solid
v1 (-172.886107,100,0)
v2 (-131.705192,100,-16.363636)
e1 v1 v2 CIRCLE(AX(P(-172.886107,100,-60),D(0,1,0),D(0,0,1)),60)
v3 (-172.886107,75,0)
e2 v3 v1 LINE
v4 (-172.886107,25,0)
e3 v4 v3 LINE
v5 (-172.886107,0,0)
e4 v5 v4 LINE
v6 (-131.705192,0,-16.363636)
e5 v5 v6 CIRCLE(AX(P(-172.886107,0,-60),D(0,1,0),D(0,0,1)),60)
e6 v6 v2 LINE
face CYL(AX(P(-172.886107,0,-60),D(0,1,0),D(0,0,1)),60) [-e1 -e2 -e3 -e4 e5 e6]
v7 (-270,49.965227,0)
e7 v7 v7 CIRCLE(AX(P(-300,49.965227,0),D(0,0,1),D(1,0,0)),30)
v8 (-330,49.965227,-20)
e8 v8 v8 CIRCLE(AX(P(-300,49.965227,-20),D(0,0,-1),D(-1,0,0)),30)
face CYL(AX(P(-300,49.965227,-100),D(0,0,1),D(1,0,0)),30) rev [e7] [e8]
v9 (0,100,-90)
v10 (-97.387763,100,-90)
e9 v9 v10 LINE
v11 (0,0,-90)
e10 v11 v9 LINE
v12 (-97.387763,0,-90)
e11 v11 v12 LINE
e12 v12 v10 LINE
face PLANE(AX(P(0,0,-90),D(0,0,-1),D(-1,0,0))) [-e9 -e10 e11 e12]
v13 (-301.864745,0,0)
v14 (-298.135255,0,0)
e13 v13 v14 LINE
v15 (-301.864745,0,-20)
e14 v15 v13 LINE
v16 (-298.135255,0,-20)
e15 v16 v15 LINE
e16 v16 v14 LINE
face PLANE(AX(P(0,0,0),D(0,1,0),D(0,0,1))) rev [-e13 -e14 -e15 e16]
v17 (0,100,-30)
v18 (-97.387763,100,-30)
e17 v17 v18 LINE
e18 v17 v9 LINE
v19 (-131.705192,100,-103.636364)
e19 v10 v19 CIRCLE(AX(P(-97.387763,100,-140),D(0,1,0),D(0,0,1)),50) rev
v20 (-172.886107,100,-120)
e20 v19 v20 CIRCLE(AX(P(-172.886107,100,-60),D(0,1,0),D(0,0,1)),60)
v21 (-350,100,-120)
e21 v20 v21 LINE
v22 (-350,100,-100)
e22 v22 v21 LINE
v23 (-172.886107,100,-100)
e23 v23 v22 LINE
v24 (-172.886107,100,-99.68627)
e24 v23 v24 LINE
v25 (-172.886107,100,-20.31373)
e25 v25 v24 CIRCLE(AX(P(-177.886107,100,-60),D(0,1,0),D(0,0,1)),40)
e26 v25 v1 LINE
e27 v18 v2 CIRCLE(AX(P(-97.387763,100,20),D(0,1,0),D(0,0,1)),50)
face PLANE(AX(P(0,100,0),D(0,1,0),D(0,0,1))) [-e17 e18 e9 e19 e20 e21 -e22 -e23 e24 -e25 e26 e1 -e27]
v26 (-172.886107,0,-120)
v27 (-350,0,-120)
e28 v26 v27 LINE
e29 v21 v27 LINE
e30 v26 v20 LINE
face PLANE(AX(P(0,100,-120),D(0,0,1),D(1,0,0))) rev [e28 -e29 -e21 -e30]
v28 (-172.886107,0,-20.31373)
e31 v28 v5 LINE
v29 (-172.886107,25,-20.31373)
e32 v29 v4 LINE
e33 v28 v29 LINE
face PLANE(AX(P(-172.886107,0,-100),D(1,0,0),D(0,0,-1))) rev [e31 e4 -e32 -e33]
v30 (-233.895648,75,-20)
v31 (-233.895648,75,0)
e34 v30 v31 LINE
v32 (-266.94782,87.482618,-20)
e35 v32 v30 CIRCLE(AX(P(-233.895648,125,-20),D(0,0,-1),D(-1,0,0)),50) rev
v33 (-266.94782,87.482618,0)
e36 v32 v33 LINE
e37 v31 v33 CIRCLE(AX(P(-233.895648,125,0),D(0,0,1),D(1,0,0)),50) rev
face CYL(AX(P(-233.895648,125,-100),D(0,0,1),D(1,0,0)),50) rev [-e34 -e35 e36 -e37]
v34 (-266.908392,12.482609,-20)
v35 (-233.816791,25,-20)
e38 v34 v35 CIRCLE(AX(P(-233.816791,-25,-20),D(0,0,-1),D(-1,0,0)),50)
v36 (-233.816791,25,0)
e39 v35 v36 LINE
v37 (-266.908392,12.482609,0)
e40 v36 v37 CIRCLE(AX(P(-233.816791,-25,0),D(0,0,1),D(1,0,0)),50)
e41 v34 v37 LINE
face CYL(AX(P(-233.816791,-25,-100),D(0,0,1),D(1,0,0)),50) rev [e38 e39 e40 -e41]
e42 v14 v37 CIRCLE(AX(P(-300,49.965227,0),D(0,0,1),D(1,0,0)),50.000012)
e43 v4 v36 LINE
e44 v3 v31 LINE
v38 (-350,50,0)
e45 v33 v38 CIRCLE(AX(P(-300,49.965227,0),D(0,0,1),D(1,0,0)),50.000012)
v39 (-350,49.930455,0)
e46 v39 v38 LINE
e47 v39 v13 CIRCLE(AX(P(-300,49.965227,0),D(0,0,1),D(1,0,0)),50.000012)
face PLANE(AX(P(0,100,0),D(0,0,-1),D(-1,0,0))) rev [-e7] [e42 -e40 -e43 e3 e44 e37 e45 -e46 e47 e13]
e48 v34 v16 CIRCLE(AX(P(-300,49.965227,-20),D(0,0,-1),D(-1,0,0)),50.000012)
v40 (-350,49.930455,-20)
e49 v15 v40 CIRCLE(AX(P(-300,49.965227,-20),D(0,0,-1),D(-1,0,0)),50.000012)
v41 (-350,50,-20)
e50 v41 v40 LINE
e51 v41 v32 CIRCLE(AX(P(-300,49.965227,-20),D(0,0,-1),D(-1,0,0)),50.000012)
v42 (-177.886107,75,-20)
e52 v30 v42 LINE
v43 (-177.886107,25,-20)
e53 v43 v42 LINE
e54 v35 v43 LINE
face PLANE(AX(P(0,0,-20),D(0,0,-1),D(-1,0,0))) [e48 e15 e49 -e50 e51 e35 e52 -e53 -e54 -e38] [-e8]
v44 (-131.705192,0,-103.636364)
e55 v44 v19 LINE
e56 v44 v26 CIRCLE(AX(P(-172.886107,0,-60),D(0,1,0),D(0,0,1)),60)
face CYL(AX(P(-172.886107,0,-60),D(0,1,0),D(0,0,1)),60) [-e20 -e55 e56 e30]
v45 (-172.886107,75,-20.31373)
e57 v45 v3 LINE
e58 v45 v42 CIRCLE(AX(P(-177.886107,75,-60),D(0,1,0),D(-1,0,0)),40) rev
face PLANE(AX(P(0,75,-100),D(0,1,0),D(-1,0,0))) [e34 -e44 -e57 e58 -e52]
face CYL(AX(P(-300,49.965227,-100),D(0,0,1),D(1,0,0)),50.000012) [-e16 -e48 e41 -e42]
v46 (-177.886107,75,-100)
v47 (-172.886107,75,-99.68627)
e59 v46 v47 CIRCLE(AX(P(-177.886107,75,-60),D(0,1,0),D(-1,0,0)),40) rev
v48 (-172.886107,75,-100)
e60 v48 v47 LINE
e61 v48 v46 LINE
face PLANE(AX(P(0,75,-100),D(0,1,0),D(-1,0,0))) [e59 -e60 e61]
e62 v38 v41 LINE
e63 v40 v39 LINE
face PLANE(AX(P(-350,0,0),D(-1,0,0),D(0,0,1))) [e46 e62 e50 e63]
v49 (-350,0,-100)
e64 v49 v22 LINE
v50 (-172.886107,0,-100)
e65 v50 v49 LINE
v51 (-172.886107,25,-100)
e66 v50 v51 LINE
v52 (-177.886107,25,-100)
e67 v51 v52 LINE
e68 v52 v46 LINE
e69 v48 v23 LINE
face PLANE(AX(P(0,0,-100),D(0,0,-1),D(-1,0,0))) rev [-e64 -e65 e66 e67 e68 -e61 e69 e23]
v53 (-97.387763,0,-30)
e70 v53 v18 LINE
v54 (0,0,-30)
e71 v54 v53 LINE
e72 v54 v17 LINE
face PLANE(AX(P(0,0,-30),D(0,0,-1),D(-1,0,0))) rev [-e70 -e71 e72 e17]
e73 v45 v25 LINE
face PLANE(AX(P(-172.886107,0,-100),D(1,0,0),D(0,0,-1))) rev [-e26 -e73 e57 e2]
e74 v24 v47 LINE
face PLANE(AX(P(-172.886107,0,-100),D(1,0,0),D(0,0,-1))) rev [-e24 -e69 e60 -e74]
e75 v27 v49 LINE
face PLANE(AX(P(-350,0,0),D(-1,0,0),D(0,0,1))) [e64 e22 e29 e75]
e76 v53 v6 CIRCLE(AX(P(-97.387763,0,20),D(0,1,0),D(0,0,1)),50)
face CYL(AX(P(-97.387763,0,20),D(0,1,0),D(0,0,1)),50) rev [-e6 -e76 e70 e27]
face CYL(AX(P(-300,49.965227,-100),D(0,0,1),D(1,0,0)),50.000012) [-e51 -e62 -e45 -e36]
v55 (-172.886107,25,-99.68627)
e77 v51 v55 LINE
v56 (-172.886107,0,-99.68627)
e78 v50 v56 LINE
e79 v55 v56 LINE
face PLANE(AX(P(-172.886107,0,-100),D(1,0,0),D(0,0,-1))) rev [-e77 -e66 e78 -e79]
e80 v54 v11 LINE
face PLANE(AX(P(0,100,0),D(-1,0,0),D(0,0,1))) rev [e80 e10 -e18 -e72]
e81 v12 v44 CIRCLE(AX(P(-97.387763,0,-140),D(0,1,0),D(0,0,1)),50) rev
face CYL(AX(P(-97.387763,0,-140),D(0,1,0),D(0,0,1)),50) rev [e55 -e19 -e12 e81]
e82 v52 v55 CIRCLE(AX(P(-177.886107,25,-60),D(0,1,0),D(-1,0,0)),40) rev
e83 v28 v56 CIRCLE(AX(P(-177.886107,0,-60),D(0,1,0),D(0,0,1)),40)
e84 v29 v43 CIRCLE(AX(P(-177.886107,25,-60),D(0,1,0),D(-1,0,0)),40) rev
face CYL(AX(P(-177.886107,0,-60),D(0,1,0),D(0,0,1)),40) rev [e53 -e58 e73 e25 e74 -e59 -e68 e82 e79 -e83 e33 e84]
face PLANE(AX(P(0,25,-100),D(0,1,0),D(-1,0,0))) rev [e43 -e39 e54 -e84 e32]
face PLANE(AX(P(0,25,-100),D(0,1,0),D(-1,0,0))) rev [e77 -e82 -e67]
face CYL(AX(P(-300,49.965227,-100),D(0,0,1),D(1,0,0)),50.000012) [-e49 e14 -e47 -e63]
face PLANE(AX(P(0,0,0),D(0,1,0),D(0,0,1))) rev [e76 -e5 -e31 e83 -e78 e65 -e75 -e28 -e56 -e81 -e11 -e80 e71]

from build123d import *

# Parameters (mm, degrees)
SKETCH1_W              = 250
SKETCH1_H              = 120
BOSS_EXTRUDE1_DEPTH    = 100
CUT_EXTRUDE1_DEPTH     = 100
SKETCH5_W              = 20
SKETCH5_H              = 100
BOSS_EXTRUDE2_DEPTH    = 100
SKETCH6_W              = 20
SKETCH6_H              = 100
BOSS_EXTRUDE3_DEPTH    = 100
CUT_EXTRUDE2_START     = -100
CUT_EXTRUDE2_OUTLINE_R = 30
CUT_EXTRUDE2_DEPTH     = 100


# Read off the part's stored shape, not the designer's step: Cut-Extrude2
with BuildPart() as part:
    # Sketch1 → Boss-Extrude1 (new body)
    with BuildSketch(Plane(origin=(0, 0, 0), x_dir=(1, 0, 0), z_dir=(0, 1, 0))):
        with Locations((-125, 60)):
            Rectangle(SKETCH1_W, SKETCH1_H)
    extrude(amount=BOSS_EXTRUDE1_DEPTH)

    # Sketch2 → Cut-Extrude1 (cut)
    with BuildSketch(Plane(origin=(0, 100, 0), x_dir=(1, 0, 0), z_dir=(0, 1, 0))):
        with BuildLine():
            Line((-137.886107131, 60), (-250, 60))
            Line((-250, 60), (-250, 20))
            Line((-250, 20), (-217.607466681, 20))
            Line((-217.607466681, 20), (-177.886107131, 20))
            ThreePointArc((-177.886107131, 20), (-149.601835883, 31.715728753), (-137.886107131, 60))
        make_face()
        with BuildLine():
            Line((-250, 100), (-250, 60))
            Line((-250, 60), (-137.886107131, 60))
            ThreePointArc((-137.886107131, 60), (-149.601835883, 88.284271247), (-177.886107131, 100))
            Line((-177.886107131, 100), (-217.607466681, 100))
            Line((-217.607466681, 100), (-250, 100))
        make_face()
        with BuildLine():
            Line((0, 0), (0, 30))
            Line((0, 30), (-97.387762778, 30))
            ThreePointArc((-97.387762778, 30), (-115.851486425, 26.466018864), (-131.705192029, 16.363636364))
            ThreePointArc((-131.705192029, 16.363636364), (-150.729638754, 4.240777363), (-172.886107131, 0))
            Line((-172.886107131, 0), (0, 0))
        make_face()
        with BuildLine():
            Line((-97.387762778, 90), (0, 90))
            Line((0, 90), (0, 120))
            Line((0, 120), (-172.886107131, 120))
            ThreePointArc((-172.886107131, 120), (-150.729638754, 115.759222637), (-131.705192029, 103.636363636))
            ThreePointArc((-131.705192029, 103.636363636), (-115.851486425, 93.533981136), (-97.387762778, 90))
        make_face()
    extrude(amount=-CUT_EXTRUDE1_DEPTH, mode=Mode.SUBTRACT)

    # Sketch5 → Boss-Extrude2 (add)
    with BuildSketch(Plane.ZY.offset(250)):
        with Locations((-110, 50)):
            Rectangle(SKETCH5_W, SKETCH5_H)
    extrude(amount=BOSS_EXTRUDE2_DEPTH)

    # Sketch6 → Boss-Extrude3 (add)
    with BuildSketch(Plane.ZY.offset(250)):
        with Locations((-10, 50)):
            Rectangle(SKETCH6_W, SKETCH6_H)
    extrude(amount=BOSS_EXTRUDE3_DEPTH)

    # Cut-Extrude2 outline → Cut-Extrude2 (cut)
    with BuildSketch(Plane.XY.offset(CUT_EXTRUDE2_START)):
        with BuildLine():
            ThreePointArc((-266.908391633, 12.482609105), (-281.440890736, 3.537211244), (-298.135255344, 0))
            Line((-298.135255344, 0), (-172.886107131, 0))
            Line((-172.886107131, 0), (-172.886107131, 25))
            Line((-172.886107131, 25), (-233.816791268, 25))
            ThreePointArc((-233.816791268, 25), (-251.506753743, 21.766069191), (-266.908391633, 12.482609105))
        make_face()
        with BuildLine():
            Line((-350, 100), (-350, 50))
            ThreePointArc((-350, 50), (-320.568029043, 95.538875256), (-266.947820205, 87.482618173))
            ThreePointArc((-266.947820205, 87.482618173), (-251.561022849, 78.224637407), (-233.895648402, 75))
            Line((-233.895648402, 75), (-172.886107131, 75))
            Line((-172.886107131, 75), (-172.886107131, 100))
            Line((-172.886107131, 100), (-350, 100))
        make_face()
        with BuildLine():
            ThreePointArc((-301.864744656, 0), (-335.996534658, 15.262911764), (-350, 49.930454547))
            Line((-350, 49.930454547), (-350, 0))
            Line((-350, 0), (-301.864744656, 0))
        make_face()
        with Locations((-300, 49.965227274)):
            Circle(CUT_EXTRUDE2_OUTLINE_R)
    extrude(amount=CUT_EXTRUDE2_DEPTH, mode=Mode.SUBTRACT)


solid = part.part
